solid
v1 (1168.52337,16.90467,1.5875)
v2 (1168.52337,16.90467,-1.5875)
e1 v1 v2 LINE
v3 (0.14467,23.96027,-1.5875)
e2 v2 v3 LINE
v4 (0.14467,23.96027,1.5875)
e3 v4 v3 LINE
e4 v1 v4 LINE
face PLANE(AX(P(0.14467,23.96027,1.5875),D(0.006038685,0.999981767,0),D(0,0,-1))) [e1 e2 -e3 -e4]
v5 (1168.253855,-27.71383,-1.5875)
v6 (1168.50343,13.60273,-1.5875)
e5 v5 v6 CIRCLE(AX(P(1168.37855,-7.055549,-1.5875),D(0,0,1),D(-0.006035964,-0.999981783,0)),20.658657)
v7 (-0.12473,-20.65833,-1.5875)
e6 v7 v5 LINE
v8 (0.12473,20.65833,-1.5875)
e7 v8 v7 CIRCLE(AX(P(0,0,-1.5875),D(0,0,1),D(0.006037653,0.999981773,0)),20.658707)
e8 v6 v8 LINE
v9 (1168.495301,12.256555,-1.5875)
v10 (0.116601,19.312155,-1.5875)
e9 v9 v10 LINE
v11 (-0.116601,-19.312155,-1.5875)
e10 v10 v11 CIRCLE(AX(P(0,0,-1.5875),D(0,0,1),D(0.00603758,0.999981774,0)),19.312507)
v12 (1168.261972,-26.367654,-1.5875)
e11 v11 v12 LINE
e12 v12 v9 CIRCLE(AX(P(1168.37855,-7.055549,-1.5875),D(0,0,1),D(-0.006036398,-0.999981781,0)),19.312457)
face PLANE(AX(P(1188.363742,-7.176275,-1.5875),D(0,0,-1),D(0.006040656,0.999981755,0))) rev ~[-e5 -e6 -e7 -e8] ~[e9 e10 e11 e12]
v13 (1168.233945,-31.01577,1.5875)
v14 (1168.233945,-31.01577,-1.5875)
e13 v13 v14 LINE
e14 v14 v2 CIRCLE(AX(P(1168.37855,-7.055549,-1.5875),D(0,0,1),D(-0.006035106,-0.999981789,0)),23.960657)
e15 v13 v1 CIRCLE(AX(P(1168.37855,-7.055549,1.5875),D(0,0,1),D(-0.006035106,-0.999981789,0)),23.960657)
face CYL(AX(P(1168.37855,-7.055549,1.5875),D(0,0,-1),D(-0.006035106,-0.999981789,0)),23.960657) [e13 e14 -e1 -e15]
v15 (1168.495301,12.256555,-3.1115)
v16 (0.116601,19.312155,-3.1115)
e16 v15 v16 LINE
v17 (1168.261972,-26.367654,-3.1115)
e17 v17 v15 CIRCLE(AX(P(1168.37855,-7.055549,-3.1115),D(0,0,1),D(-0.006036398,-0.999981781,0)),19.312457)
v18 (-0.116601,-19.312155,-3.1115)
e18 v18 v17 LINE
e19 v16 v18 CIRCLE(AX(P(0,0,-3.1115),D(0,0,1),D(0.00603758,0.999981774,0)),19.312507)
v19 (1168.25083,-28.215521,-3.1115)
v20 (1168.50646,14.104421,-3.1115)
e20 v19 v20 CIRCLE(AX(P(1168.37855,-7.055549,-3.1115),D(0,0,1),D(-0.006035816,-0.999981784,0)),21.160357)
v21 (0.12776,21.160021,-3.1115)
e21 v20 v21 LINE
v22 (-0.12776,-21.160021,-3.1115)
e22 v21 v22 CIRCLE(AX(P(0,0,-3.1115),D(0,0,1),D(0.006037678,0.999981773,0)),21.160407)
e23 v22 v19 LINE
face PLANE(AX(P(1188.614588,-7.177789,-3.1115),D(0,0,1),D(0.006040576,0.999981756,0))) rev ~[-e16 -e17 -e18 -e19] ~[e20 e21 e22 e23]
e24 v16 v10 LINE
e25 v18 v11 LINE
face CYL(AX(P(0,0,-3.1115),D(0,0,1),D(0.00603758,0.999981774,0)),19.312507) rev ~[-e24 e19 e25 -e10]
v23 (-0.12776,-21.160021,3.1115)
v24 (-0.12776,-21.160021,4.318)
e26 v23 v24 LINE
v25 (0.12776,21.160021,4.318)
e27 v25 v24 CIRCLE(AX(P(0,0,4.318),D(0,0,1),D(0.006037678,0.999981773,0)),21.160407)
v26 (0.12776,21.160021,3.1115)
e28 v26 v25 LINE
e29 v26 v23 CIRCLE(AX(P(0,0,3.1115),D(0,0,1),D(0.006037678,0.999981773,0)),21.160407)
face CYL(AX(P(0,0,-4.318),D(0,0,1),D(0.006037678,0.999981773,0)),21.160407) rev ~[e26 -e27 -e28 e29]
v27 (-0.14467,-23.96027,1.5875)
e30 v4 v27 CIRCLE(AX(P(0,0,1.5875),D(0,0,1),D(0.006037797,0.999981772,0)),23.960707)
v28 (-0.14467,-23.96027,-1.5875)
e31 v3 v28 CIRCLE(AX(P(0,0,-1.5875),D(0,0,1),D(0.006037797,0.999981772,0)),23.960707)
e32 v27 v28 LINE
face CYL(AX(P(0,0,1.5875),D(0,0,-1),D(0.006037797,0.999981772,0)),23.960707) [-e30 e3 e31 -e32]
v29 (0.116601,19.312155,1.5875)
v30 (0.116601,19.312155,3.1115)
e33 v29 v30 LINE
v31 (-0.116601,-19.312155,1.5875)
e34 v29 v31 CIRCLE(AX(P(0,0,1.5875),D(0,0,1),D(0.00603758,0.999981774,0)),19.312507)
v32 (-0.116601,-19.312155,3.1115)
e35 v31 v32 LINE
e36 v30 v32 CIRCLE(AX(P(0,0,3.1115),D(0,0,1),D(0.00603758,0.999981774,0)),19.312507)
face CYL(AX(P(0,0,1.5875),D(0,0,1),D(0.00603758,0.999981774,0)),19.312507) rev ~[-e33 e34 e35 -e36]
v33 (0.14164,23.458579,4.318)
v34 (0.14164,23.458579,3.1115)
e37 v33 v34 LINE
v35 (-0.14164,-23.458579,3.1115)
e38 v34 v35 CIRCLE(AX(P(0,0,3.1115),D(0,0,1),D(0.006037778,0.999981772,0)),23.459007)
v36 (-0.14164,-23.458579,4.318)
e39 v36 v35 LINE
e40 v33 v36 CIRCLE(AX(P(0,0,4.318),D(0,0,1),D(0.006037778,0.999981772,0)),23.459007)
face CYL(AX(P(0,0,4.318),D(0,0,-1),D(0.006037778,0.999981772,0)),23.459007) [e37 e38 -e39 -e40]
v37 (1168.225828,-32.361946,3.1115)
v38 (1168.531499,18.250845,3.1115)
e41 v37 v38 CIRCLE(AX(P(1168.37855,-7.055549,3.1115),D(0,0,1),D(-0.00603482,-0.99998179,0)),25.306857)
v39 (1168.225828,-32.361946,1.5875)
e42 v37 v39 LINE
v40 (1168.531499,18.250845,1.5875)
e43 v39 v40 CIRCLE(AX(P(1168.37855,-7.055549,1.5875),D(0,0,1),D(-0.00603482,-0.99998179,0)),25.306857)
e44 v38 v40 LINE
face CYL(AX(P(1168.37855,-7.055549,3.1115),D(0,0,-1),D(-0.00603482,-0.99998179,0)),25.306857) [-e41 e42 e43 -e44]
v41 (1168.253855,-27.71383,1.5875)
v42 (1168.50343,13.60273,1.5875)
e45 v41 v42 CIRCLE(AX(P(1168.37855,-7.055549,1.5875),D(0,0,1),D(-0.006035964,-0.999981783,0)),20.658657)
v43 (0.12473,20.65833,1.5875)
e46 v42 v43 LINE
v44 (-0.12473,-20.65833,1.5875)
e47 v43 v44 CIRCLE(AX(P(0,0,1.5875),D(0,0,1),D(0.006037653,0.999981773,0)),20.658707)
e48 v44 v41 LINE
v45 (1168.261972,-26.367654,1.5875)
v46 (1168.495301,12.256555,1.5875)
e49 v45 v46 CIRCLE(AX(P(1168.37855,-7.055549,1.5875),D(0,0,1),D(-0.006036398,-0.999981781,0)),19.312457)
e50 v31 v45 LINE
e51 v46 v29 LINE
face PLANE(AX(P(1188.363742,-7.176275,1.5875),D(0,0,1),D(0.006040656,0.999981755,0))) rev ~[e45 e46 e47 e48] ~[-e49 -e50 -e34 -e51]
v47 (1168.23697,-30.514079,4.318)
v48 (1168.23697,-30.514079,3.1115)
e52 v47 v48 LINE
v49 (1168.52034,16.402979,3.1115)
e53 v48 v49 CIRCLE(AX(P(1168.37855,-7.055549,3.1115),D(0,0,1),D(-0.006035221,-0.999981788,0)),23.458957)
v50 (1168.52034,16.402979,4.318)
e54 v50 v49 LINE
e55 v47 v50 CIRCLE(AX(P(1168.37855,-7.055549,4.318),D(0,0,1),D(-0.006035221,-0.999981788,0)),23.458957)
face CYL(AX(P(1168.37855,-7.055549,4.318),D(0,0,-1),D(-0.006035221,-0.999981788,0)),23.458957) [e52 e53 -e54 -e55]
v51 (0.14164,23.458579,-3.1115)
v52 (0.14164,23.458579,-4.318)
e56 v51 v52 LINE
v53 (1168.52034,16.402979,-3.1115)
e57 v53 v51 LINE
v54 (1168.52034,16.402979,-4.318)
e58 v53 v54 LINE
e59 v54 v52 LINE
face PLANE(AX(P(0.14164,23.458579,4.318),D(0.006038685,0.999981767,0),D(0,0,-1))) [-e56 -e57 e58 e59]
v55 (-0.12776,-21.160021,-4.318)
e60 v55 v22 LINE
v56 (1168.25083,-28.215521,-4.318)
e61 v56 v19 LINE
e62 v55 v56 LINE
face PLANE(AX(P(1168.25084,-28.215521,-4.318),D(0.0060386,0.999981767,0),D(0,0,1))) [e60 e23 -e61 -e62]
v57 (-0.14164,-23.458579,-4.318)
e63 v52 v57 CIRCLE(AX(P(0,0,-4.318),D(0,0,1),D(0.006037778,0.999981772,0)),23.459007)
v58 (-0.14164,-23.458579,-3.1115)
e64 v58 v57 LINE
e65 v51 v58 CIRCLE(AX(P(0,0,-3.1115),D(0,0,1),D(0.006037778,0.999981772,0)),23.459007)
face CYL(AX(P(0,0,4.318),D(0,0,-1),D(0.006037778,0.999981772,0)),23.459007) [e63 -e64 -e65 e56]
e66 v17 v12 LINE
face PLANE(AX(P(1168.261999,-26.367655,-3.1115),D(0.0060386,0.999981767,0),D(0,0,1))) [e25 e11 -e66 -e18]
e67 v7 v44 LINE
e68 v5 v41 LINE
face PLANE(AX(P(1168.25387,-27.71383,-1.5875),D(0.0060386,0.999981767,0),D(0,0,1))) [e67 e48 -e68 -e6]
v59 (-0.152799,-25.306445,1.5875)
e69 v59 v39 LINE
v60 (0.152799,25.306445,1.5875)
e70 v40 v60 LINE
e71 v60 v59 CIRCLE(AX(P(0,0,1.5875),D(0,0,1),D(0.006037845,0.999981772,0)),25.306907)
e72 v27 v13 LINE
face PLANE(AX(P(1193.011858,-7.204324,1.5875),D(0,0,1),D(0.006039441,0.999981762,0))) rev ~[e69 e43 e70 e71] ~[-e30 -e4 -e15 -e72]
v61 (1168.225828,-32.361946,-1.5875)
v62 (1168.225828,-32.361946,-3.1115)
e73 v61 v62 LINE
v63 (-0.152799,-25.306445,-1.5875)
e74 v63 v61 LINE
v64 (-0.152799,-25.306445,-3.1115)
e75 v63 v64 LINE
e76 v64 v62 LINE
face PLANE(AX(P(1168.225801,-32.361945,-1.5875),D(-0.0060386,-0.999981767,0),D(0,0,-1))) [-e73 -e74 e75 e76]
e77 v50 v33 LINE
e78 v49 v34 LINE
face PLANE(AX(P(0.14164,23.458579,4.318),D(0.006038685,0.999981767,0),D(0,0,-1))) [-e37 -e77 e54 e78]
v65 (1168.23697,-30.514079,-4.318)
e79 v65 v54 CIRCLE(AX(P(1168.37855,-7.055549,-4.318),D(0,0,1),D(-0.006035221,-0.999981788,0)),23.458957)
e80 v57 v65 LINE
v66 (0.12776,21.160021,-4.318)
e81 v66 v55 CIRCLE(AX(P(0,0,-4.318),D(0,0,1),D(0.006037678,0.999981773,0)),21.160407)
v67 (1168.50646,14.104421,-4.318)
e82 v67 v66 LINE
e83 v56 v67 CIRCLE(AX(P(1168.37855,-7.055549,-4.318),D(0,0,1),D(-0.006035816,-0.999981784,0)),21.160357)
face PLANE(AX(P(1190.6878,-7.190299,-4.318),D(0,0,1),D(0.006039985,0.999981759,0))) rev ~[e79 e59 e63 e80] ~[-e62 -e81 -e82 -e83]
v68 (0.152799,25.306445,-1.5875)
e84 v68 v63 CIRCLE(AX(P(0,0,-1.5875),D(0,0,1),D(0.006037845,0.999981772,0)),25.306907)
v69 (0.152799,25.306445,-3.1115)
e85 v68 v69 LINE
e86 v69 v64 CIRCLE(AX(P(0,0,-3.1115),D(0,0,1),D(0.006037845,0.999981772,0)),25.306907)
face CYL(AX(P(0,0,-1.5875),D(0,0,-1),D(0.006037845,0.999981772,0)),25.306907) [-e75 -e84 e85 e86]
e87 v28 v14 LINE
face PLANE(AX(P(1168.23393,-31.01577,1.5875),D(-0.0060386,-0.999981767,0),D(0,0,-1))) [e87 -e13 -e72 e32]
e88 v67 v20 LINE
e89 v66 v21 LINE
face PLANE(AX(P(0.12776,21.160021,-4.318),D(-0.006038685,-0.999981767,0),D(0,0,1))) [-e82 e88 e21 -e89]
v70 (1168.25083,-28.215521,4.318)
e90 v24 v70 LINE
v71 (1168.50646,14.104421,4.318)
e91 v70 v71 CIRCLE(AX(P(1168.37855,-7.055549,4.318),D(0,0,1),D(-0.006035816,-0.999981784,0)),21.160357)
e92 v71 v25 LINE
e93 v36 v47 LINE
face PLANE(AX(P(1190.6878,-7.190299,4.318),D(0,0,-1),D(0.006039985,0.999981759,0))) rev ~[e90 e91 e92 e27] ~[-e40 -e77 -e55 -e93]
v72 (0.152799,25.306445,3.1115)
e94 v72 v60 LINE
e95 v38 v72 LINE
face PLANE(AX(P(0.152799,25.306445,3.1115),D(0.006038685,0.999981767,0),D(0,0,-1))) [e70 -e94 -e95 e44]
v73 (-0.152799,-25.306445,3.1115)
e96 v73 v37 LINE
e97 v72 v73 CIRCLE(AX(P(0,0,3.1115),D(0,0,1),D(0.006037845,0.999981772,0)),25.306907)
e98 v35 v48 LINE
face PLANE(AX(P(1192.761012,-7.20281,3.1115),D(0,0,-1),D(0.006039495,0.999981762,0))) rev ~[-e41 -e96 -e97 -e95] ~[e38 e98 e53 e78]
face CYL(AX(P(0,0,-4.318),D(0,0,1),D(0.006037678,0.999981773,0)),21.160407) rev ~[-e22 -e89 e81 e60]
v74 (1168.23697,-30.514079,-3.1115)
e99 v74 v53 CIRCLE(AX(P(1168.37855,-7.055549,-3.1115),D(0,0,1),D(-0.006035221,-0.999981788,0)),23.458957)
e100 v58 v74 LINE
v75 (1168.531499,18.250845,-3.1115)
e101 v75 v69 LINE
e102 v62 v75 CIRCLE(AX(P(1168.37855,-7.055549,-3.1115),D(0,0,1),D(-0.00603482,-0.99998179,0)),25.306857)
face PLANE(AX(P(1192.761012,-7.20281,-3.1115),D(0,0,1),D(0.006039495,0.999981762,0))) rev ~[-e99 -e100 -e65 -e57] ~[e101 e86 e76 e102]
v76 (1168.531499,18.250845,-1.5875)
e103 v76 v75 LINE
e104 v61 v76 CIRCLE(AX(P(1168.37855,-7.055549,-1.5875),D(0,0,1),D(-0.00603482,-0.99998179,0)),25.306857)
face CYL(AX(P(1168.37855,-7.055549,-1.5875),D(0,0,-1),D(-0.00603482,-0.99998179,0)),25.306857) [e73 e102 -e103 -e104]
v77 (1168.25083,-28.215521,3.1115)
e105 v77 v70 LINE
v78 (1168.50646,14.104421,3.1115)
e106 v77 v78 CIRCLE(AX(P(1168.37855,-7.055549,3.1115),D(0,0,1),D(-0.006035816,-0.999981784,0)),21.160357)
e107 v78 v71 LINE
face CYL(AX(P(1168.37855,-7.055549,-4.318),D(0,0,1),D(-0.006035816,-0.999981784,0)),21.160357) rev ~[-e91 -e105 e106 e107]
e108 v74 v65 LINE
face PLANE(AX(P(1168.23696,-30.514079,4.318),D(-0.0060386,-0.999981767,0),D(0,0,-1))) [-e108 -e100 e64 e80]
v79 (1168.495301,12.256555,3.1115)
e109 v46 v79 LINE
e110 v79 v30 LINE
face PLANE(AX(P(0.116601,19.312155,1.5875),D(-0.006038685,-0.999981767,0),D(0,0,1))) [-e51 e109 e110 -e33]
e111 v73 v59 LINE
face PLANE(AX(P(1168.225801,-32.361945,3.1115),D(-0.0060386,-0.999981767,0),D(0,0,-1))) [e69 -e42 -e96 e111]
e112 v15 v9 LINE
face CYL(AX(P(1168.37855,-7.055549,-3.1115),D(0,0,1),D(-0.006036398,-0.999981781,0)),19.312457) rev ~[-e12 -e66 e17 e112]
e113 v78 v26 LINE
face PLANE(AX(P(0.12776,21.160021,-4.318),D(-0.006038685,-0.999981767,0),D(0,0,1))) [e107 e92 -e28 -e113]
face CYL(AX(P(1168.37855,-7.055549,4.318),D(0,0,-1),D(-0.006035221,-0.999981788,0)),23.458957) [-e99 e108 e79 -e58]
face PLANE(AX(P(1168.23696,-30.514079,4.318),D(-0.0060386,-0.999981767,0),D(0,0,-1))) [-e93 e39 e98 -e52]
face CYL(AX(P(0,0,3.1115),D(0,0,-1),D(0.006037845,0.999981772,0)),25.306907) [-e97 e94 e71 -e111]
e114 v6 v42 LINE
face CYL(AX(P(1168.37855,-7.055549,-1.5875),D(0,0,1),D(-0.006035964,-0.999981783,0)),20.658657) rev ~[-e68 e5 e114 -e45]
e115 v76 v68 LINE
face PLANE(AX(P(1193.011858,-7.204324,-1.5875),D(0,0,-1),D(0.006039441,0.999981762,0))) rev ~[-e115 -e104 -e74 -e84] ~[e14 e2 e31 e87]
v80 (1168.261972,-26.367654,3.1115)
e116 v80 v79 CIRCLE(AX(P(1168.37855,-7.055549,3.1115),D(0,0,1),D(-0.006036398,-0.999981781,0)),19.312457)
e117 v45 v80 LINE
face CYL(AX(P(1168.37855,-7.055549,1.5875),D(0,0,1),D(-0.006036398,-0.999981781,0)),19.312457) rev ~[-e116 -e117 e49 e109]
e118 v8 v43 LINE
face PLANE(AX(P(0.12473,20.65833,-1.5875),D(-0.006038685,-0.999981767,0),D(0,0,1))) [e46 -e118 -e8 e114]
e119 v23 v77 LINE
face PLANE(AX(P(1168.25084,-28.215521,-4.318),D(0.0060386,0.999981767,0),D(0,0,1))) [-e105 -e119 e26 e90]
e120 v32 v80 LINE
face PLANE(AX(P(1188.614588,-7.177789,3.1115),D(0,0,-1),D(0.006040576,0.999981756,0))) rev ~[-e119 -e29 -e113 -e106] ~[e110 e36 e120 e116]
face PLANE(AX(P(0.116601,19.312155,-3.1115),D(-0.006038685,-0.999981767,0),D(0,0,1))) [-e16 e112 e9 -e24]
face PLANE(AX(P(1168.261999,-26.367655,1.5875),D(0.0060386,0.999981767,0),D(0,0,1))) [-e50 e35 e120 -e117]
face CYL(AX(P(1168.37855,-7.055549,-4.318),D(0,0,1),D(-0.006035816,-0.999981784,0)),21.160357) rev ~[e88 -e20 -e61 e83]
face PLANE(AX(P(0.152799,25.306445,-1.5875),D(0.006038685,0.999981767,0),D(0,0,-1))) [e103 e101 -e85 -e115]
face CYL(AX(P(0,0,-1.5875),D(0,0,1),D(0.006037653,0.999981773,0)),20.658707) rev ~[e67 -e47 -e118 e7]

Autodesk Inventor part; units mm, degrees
ref_plane "Work Plane2" through (0, 0, 0) normal (-1, 0, 0) x (0, 0, 1)
ref_plane "Work Plane3" through (1168.3786, -7.0556, 0) normal (-0.959493, 0.2817325, 0) x (0, 0, 1)
sketch "Path" plane through (0, 0, 0) normal (0, 0, 1) x (1, 0, 0)
  arc A0 (0.1347, 22.3093) -> (-0.1347, -22.3093) centre (0, 0) ccw
  arc A1 (1168.2439, -29.3648) -> (1168.5134, 15.2537) centre (1168.3786, -7.0556) ccw
  line L0 (1168.2439, -29.3648) -> (-0.1347, -22.3093)
  line L1 (0.1347, 22.3093) -> (1168.5134, 15.2537)
  dimension "d31" = 5.9944
ref_plane "Section Plane" through (-0.1347, -22.3093, 0) normal (0.9999818, -0.0060387, 0) x (0, 0, 1)
sketch "Section Sketch" plane through (-0.1347, -22.3093, 0) normal (0.9999818, -0.0060387, 0) x (0, 0, 1)
  line L0 (-4.318, -1.1493) -> (4.318, -1.1493)
  line L1 (4.318, -1.1493) -> (4.318, 1.1493)
  line L2 (4.318, 1.1493) -> (-4.318, 1.1493)
  line L3 (-4.318, 1.1493) -> (-4.318, -1.1493)
  line L4 (-1.5875, -1.651) -> (1.5875, -1.651)
  line L5 (1.5875, -1.651) -> (1.5875, 1.651)
  line L6 (1.5875, 1.651) -> (-1.5875, 1.651)
  line L7 (-1.5875, 1.651) -> (-1.5875, -1.651)
  line L8 (-1.5875, 0) -> (1.5875, 0) construction
  line L9 (-3.1115, -2.9972) -> (-1.5875, -2.9972)
  line L10 (-1.5875, -2.9972) -> (-1.5875, 2.9972)
  line L11 (-1.5875, 2.9972) -> (-3.1115, 2.9972)
  line L12 (-3.1115, 2.9972) -> (-3.1115, -2.9972)
  line L13 (1.5875, -2.9972) -> (3.1115, -2.9972)
  line L14 (3.1115, -2.9972) -> (3.1115, 2.9972)
  line L15 (3.1115, 2.9972) -> (1.5875, 2.9972)
  line L16 (1.5875, 2.9972) -> (1.5875, -2.9972)
  line L17 (-4.318, 0) -> (4.318, 0) construction
  point P0 (0, 0)
  point P1 (0, 0)
  dimension "d21" = 2.2987
  dimension "d22" = 3.302
  dimension "d23" = 3.175
  dimension "d24" = 1.524
  dimension "d31" = 5.9944
  dimension "d32" = 8.636
sweep "Solid" add profiles "Section Sketch" path "Path"
pattern_of_one "Strand Pattern"
equation "\"d21\" = da_d2"
equation "\"d22\" = da_d1"
equation "\"d23\" = da_b1"
equation "\"d24\" = da_t1 + da_t2"
equation "\"d30\" = da_pt"
equation "\"da_p\" = 6.35"
equation "\"da_b1\" = 3.175"
equation "\"da_h2\" = 5.9944"
equation "\"da_h3\" = 5.207"
equation "\"da_d1\" = 3.302"
equation "\"da_d2\" = 2.2987"
equation "\"da_pt\" = 6.4008"
equation "\"da_b\" = 8.636"
equation "\"da_t1\" = 0.762"
equation "\"da_t2\" = 0.762"
properties part number "Roller Chain"
